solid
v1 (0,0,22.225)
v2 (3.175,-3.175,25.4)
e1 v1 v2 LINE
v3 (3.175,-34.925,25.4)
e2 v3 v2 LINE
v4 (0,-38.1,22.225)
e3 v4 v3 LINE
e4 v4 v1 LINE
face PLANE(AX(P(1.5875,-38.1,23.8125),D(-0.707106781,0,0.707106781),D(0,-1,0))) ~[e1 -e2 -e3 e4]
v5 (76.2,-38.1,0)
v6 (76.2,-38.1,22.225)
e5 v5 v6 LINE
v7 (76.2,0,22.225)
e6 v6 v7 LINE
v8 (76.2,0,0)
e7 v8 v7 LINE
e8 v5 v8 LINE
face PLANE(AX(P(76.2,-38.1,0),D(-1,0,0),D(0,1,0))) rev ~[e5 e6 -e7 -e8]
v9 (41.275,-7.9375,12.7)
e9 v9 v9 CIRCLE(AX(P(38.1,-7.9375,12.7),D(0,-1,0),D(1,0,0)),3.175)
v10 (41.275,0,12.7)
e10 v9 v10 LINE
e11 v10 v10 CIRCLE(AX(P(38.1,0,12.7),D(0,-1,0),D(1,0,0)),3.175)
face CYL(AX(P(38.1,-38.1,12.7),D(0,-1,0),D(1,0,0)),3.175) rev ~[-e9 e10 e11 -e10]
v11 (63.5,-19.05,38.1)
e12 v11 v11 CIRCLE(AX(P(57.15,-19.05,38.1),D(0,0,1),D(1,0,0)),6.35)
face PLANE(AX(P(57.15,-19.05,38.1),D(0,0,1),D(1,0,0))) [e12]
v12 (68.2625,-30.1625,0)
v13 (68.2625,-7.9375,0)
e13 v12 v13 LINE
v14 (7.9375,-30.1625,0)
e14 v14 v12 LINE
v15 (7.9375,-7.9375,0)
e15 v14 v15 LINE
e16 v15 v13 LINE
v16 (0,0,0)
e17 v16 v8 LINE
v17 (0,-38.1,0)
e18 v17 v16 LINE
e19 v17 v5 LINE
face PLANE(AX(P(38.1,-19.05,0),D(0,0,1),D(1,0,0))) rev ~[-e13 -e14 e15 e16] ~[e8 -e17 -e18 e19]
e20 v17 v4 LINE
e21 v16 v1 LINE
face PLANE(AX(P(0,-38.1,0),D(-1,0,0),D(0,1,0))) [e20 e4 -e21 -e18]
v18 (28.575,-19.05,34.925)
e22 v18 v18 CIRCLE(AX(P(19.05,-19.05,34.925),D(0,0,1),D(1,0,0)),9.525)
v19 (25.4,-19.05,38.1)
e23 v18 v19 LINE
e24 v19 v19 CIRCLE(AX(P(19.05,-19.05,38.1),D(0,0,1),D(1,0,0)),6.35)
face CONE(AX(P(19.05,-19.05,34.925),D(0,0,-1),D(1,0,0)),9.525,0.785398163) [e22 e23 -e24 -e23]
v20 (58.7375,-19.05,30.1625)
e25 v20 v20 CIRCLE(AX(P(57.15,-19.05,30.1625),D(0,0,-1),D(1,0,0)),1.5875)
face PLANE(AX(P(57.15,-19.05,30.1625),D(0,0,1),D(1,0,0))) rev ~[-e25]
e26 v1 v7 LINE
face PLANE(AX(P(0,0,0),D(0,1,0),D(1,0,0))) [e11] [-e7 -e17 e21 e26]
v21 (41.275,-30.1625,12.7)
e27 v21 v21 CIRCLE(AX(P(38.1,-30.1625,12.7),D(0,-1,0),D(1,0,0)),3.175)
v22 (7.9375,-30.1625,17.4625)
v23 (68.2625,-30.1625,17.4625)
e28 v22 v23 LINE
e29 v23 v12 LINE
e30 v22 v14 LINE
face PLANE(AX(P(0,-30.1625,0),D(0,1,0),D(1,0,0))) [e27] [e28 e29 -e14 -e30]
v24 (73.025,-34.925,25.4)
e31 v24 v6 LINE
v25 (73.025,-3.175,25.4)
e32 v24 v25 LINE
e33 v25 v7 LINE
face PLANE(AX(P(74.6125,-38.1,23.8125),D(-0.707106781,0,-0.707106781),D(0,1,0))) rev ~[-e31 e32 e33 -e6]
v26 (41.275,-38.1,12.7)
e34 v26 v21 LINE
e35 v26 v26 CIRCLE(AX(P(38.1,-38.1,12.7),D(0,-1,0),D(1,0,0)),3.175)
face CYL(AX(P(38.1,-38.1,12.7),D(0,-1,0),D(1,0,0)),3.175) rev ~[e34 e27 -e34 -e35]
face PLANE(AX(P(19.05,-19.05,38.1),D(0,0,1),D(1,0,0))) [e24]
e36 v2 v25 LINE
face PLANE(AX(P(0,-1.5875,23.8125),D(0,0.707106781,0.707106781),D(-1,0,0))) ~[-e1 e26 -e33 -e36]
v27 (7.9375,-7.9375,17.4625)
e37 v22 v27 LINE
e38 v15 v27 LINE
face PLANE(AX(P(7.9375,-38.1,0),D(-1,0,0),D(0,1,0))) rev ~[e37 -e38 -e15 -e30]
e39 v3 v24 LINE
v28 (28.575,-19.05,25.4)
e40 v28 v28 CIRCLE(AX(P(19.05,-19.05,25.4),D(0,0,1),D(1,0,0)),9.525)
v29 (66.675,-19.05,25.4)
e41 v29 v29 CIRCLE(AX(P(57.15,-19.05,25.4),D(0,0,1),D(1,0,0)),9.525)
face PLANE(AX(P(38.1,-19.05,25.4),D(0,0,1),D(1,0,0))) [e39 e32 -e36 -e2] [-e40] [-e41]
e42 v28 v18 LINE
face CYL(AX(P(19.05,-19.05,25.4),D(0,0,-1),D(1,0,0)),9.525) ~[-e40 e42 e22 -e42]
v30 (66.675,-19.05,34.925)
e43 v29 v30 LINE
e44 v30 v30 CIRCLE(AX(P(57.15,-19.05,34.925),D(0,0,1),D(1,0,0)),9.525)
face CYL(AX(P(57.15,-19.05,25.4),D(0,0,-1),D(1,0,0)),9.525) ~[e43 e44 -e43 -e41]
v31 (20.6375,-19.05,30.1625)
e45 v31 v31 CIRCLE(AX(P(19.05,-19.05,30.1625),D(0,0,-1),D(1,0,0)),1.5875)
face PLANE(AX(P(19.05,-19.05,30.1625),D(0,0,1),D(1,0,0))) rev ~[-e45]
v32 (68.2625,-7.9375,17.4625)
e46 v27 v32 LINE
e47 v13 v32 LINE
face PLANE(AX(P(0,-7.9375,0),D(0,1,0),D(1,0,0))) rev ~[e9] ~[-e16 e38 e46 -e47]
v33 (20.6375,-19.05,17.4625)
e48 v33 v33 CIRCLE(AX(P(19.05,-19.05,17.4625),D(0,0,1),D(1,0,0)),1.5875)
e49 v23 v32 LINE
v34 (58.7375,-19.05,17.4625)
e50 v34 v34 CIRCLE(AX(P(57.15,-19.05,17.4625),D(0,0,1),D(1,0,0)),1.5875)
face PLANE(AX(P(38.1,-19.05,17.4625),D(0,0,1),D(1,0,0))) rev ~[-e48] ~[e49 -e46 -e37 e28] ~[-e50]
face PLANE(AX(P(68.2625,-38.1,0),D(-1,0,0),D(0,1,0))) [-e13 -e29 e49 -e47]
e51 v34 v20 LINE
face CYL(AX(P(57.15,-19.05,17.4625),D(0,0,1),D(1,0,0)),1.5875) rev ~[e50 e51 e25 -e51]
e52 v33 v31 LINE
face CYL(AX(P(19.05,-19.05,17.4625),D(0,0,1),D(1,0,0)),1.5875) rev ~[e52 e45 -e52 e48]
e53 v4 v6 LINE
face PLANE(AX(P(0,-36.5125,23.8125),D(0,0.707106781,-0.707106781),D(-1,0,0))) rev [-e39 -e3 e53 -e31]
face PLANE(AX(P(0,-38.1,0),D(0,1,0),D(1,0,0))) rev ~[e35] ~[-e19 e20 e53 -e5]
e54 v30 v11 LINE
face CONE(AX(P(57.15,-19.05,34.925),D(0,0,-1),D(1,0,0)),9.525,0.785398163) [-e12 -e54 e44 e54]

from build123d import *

# Parameters (mm, degrees)
F0_W     = 76.2
F0_H     = 38.1
F1_DEPTH = 25.4
F2_R     = 9.525
F3_DEPTH = 12.7
F4_SIZE2 = 3.175
F4_SIZE  = 3.175
F5_T     = 7.9375
F6_R     = 3.175
F7_DEPTH = 38.1


# Not quite as in the source:
# - a shell that OpenCascade refuses in one call is made with other operations: the cavity is built on its own and cut out


with BuildPart() as f1:
    # F0 (on Top) → F1 (new body)
    with BuildSketch(Plane.XY):
        with Locations((38.1, -19.05)):
            Rectangle(F0_W, F0_H)
    extrude(amount=F1_DEPTH)

    # F2 (on face) → F3 (join)
    with BuildSketch(Plane.XY.offset(25.4)):
        with Locations((57.15, -19.05)):
            Circle(F2_R)
        with Locations((19.05, -19.05)):
            Circle(F2_R)
    extrude(amount=F3_DEPTH)

    # F4
    f4_edges = [f1.edges().sort_by_distance(p)[0] for p in [
        (9.525, -19.05, 38.1),
        (47.625, -19.05, 38.1),
        (76.2, -19.05, 25.4),
        (38.1, -38.1, 25.4),
        (0, -19.05, 25.4),
        (38.1, 0, 25.4),
    ]]
    chamfer(f4_edges, length=F4_SIZE, length2=F4_SIZE2)

    # F5: shell of thickness 7.9375, made by hand


with BuildPart() as f5_core1:
    # F5_t2: copy of F1
    add(f1.part)

    # the walls: a layer under each face that stays
    f5_faces = [f5_core1.faces().sort_by_distance(p)[0] for p in [
        (38.1, 0, 11.1125),
        (76.2, -19.05, 11.1125),
        (38.1, -1.5875, 23.8125),
        (0, -19.05, 11.1125),
        (38.1, -38.1, 11.1125),
        (74.6125, -19.05, 23.8125),
        (38.1, -19.05, 25.4),
        (1.5875, -19.05, 23.8125),
        (38.1, -36.5125, 23.8125),
        (9.525, -19.05, 30.1625),
        (47.625, -19.05, 30.1625),
        (11.1125, -19.05, 36.5125),
        (49.2125, -19.05, 36.5125),
        (19.05, -19.05, 38.1),
        (57.15, -19.05, 38.1),
    ]]
    thicken(f5_faces, amount=-F5_T, mode=Mode.SUBTRACT)

    # F5_s3 → F5_t4 (revolve, cut)
    with BuildSketch(Plane.XZ.offset(19.05)):
        Polygon((28.654375, 25.479375), (28.575, 17.4625), (20.6375, 17.4625), (20.6375, 25.4), align=None)
    revolve(axis=Axis((19.05, -19.05, 25.4), (0, 0, 1)), mode=Mode.SUBTRACT)

    # F5_s5 → F5_t6 (revolve, cut)
    with BuildSketch(Plane.XZ.offset(19.05)):
        Polygon((66.754375, 25.479375), (66.675, 17.4625), (58.7375, 17.4625), (58.7375, 25.4), align=None)
    revolve(axis=Axis((57.15, -19.05, 25.4), (0, 0, 1)), mode=Mode.SUBTRACT)


with BuildPart() as f1_1:
    add(f1.part)

    # what is left inside the walls is the cavity
    f5_cavity = [f5_core1.part.solids().sort_by_distance(p)[0] for p in [
        (38.1, -22.754167, 0.079375),
    ]]
    add(f5_cavity, mode=Mode.SUBTRACT)

    # F6 (on face) → F7 (cut)
    with BuildSketch(Plane.XZ.offset(38.1)):
        with Locations((38.1, 12.7)):
            Circle(F6_R)
    extrude(amount=-F7_DEPTH, mode=Mode.SUBTRACT)


solid = f1_1.part
